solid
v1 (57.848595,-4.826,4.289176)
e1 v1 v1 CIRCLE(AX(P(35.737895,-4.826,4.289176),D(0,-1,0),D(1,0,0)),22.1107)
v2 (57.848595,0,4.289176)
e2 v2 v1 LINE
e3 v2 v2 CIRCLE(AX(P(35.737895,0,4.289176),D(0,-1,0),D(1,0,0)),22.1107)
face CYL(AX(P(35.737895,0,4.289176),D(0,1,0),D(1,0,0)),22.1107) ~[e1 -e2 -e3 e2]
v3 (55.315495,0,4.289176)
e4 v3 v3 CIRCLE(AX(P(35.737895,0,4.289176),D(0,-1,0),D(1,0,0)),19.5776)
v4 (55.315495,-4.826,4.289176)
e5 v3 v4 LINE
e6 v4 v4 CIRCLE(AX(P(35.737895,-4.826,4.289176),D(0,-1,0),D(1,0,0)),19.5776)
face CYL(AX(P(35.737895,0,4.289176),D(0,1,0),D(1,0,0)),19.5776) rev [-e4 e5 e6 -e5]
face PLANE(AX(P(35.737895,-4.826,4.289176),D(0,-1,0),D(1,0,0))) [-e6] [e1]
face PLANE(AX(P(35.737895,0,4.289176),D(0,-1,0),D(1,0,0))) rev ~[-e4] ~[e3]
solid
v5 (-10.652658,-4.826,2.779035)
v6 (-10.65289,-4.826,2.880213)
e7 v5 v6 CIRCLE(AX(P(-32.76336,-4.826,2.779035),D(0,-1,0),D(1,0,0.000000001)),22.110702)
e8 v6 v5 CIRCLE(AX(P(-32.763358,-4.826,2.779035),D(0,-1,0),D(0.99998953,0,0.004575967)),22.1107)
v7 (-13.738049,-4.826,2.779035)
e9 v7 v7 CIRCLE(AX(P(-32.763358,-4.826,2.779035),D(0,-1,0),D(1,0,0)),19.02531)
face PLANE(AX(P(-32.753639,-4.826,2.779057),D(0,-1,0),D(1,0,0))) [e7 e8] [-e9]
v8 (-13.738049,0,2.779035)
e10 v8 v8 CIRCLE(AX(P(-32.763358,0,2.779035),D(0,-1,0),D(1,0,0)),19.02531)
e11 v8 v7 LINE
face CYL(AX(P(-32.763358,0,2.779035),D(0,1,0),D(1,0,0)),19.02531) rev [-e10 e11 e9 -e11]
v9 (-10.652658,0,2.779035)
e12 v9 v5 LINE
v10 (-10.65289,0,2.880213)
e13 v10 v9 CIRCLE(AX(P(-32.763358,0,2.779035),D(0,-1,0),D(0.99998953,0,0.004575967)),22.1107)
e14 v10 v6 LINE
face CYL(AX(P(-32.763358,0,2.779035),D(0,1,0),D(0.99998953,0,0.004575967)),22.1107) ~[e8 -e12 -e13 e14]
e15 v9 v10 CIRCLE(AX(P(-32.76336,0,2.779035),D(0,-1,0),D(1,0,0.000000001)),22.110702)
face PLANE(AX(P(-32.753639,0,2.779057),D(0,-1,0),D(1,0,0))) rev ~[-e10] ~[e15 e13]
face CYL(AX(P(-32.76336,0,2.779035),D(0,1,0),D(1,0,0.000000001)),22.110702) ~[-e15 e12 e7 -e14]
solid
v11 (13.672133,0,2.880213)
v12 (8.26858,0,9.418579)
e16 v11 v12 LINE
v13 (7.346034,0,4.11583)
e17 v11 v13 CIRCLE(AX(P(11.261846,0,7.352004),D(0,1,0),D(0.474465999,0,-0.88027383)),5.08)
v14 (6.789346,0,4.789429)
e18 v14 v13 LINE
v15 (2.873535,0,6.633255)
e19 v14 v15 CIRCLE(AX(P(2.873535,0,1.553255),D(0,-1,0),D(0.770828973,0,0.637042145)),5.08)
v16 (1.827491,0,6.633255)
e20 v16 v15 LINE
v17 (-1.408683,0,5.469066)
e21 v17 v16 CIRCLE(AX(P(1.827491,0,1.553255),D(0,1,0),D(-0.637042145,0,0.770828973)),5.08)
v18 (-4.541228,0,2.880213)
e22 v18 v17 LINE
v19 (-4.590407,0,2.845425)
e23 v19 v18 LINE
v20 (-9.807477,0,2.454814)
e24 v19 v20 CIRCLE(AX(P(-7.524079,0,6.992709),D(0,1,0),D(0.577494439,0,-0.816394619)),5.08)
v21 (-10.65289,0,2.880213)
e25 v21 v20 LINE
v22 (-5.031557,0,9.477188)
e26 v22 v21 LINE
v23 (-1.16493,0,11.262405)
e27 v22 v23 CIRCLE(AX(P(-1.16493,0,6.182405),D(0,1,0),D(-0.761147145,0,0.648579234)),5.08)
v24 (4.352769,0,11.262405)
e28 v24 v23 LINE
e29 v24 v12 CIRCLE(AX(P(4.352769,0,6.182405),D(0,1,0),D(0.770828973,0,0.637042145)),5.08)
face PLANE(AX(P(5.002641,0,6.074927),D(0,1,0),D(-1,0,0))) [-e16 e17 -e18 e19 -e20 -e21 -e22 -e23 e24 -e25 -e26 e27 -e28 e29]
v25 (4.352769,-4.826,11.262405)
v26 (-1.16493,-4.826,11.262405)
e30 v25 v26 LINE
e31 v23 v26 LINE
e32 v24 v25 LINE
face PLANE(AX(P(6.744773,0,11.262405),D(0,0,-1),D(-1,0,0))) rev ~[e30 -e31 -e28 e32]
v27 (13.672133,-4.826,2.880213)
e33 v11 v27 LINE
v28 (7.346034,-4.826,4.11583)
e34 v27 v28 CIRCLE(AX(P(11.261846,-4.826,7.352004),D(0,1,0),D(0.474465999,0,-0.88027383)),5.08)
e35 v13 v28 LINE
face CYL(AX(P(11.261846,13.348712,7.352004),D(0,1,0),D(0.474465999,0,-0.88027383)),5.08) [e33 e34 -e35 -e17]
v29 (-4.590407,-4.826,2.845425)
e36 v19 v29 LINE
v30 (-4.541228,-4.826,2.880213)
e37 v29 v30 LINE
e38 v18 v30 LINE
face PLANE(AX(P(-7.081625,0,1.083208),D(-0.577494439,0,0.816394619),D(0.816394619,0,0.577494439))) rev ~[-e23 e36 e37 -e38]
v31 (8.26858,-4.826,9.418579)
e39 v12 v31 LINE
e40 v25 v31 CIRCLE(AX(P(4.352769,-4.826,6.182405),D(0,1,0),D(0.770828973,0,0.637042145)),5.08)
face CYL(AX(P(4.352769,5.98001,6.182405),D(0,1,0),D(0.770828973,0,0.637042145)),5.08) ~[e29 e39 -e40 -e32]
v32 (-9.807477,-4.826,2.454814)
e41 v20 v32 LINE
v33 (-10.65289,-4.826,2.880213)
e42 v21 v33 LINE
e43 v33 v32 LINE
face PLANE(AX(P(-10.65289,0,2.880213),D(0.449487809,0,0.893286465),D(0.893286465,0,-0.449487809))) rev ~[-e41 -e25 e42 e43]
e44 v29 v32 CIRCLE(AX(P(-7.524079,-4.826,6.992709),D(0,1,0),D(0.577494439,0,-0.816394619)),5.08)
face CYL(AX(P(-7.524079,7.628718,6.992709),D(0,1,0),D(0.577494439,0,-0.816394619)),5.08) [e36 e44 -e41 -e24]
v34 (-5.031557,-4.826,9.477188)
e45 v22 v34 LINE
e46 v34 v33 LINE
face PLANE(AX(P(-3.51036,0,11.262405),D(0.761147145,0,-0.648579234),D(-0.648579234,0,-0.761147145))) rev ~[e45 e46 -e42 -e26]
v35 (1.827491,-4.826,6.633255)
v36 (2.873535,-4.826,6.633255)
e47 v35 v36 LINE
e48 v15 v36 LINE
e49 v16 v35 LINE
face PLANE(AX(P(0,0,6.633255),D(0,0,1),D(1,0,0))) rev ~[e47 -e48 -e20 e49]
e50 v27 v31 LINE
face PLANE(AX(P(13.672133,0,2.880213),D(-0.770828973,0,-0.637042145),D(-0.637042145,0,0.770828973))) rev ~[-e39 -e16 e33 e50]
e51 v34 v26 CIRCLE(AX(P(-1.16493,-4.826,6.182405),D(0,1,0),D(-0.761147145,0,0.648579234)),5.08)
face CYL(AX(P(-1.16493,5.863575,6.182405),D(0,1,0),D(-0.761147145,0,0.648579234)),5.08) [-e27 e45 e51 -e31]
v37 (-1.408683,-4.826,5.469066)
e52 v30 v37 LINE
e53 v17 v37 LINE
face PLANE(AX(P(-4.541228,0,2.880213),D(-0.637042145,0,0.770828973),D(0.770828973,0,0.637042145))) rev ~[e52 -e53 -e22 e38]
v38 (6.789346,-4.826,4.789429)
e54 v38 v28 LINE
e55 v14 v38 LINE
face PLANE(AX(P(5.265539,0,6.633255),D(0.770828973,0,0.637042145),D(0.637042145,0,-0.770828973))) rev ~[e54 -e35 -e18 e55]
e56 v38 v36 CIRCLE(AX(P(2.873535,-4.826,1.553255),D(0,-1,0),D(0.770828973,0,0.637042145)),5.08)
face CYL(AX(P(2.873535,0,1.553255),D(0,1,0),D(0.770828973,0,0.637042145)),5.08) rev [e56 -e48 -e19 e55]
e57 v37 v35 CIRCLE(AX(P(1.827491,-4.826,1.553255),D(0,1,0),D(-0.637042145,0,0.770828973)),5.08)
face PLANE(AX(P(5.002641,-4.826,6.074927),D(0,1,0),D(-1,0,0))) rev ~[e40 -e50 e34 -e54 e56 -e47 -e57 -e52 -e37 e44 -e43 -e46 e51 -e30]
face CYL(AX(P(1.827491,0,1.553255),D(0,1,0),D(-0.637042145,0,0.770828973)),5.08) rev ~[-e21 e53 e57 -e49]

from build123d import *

# Parameters (mm, degrees)
F0_R         = 19.577599846
F1_DEPTH     = 4.826
F0_R_2       = 19.025309539
F2_T1_DEPTH  = 4.826
F2_T3_DEPTH  = 4.826
F2_T5_DEPTH  = 31.5234235451
F2_T7_DEPTH  = 16.7860194566
F2_T9_DEPTH  = 16.5531509264
F2_T11_DEPTH = 20.0834356368


# Not quite as in the source:
# - a fillet or chamfer that OpenCascade refuses, or shapes differently, is made with other operations: its cross-section is extruded or revolved along the edge and cut away or added


with BuildPart() as f1:
    # F0 (on Front) → F1 (new body)
    with BuildSketch(Plane.XZ):
        with BuildLine():
            ThreePointArc((13.6721328815, 2.8802125551), (36.442735195, -17.8102871686), (57.8485954466, 4.2891756172))
            ThreePointArc((57.8485954466, 4.2891756172), (35.0330556983, 26.3886384029), (13.6721328815, 2.8802125551))
        make_face()
        with Locations((35.7378954466, 4.2891756172)):
            Circle(F0_R, mode=Mode.SUBTRACT)
    extrude(amount=F1_DEPTH)


with BuildPart() as f1b:
    # F0 (on Front) → F1, piece 2 (new body)
    with BuildSketch(Plane.XZ):
        with BuildLine():
            ThreePointArc((-10.6526581482, 2.7790347432), (-10.6527160219, 2.8296237815), (-10.6528896426, 2.8802125551))
            ThreePointArc((-10.6528896426, 2.8802125551), (-54.8740002746, 2.7284457048), (-10.6526581482, 2.7790347432))
        make_face()
        with Locations((-32.7633581482, 2.7790347432)):
            Circle(F0_R_2, mode=Mode.SUBTRACT)
    extrude(amount=F1_DEPTH)


with BuildPart() as f1c:
    # F0 (on Front) → F1, piece 3 (new body)
    with BuildSketch(Plane.XZ):
        Polygon((10.7475112172, 0), (13.6721328815, 2.8802125551), (6.7447727473, 11.2624050619), (-3.5103600677, 11.2624050619), (-10.6528896426, 2.8802125551), (-7.0816248551, 1.0832078445), (-4.5412281389, 2.8802125551), (0, 6.6332548222), (5.2655391702, 6.6332548222), align=None)
    extrude(amount=F1_DEPTH)

    # F2: fillet of radius 5.08 on 6 edges, made by hand

    # F2_s2 → F2_t1 (join)
    with BuildSketch(Plane.XZ):
        with BuildLine():
            ThreePointArc((-1.4086830483, 5.4690660038), (0.1078865603, 6.3333552815), (1.8274910494, 6.6332548222))
            Line((1.8274910494, 6.6332548222), (0, 6.6332548222))
            Line((0, 6.6332548222), (-1.4086830483, 5.4690660038))
        make_face()
    extrude(amount=F2_T1_DEPTH)

    # F2_s4 → F2_t3 (join)
    with BuildSketch(Plane.XZ):
        with BuildLine():
            ThreePointArc((6.7893464605, 4.7894289199), (5.0376327333, 6.1492402669), (2.8735352789, 6.6332548222))
            Line((2.8735352789, 6.6332548222), (5.2655391702, 6.6332548222))
            Line((5.2655391702, 6.6332548222), (6.7893464605, 4.7894289199))
        make_face()
    extrude(amount=F2_T3_DEPTH)

    # F2_s6 → F2_t5 (cut)
    with BuildSketch(Plane.XZ.offset(-13.3487117726)):
        with BuildLine():
            ThreePointArc((13.6721328815, 2.8802125551), (10.2880191967, 2.3662176021), (7.3460344239, 4.1158295133))
            Line((7.3460344239, 4.1158295133), (10.7475112172, 0))
            Line((10.7475112172, 0), (13.6721328815, 2.8802125551))
        make_face()
    extrude(amount=F2_T5_DEPTH, mode=Mode.SUBTRACT)

    # F2_s8 → F2_t7 (cut)
    with BuildSketch(Plane.XZ.offset(-5.9800097283)):
        with BuildLine():
            ThreePointArc((8.2685800376, 9.4185791596), (6.5168663104, 10.7783905066), (4.352768856, 11.2624050619))
            Line((4.352768856, 11.2624050619), (6.7447727473, 11.2624050619))
            Line((6.7447727473, 11.2624050619), (8.2685800376, 9.4185791596))
        make_face()
    extrude(amount=F2_T7_DEPTH, mode=Mode.SUBTRACT)

    # F2_s10 → F2_t9 (cut)
    with BuildSketch(Plane.XZ.offset(-5.8635754632)):
        with BuildLine():
            ThreePointArc((-5.0315573811, 9.4771875716), (-3.2943552568, 10.7945572249), (-1.1649298824, 11.2624050619))
            Line((-1.1649298824, 11.2624050619), (-3.5103600677, 11.2624050619))
            Line((-3.5103600677, 11.2624050619), (-5.0315573811, 9.4771875716))
        make_face()
    extrude(amount=F2_T9_DEPTH, mode=Mode.SUBTRACT)

    # F2_s12 → F2_t11 (cut)
    with BuildSketch(Plane.XZ.offset(-7.6287178184)):
        with BuildLine():
            ThreePointArc((-4.5904071854, 2.84542469), (-7.1447926035, 1.9268884046), (-9.8074770052, 2.4548141088))
            Line((-9.8074770052, 2.4548141088), (-7.0816248551, 1.0832078445))
            Line((-7.0816248551, 1.0832078445), (-4.5904071854, 2.84542469))
        make_face()
    extrude(amount=F2_T11_DEPTH, mode=Mode.SUBTRACT)


solid = Compound([f1.part, f1b.part, f1c.part])
